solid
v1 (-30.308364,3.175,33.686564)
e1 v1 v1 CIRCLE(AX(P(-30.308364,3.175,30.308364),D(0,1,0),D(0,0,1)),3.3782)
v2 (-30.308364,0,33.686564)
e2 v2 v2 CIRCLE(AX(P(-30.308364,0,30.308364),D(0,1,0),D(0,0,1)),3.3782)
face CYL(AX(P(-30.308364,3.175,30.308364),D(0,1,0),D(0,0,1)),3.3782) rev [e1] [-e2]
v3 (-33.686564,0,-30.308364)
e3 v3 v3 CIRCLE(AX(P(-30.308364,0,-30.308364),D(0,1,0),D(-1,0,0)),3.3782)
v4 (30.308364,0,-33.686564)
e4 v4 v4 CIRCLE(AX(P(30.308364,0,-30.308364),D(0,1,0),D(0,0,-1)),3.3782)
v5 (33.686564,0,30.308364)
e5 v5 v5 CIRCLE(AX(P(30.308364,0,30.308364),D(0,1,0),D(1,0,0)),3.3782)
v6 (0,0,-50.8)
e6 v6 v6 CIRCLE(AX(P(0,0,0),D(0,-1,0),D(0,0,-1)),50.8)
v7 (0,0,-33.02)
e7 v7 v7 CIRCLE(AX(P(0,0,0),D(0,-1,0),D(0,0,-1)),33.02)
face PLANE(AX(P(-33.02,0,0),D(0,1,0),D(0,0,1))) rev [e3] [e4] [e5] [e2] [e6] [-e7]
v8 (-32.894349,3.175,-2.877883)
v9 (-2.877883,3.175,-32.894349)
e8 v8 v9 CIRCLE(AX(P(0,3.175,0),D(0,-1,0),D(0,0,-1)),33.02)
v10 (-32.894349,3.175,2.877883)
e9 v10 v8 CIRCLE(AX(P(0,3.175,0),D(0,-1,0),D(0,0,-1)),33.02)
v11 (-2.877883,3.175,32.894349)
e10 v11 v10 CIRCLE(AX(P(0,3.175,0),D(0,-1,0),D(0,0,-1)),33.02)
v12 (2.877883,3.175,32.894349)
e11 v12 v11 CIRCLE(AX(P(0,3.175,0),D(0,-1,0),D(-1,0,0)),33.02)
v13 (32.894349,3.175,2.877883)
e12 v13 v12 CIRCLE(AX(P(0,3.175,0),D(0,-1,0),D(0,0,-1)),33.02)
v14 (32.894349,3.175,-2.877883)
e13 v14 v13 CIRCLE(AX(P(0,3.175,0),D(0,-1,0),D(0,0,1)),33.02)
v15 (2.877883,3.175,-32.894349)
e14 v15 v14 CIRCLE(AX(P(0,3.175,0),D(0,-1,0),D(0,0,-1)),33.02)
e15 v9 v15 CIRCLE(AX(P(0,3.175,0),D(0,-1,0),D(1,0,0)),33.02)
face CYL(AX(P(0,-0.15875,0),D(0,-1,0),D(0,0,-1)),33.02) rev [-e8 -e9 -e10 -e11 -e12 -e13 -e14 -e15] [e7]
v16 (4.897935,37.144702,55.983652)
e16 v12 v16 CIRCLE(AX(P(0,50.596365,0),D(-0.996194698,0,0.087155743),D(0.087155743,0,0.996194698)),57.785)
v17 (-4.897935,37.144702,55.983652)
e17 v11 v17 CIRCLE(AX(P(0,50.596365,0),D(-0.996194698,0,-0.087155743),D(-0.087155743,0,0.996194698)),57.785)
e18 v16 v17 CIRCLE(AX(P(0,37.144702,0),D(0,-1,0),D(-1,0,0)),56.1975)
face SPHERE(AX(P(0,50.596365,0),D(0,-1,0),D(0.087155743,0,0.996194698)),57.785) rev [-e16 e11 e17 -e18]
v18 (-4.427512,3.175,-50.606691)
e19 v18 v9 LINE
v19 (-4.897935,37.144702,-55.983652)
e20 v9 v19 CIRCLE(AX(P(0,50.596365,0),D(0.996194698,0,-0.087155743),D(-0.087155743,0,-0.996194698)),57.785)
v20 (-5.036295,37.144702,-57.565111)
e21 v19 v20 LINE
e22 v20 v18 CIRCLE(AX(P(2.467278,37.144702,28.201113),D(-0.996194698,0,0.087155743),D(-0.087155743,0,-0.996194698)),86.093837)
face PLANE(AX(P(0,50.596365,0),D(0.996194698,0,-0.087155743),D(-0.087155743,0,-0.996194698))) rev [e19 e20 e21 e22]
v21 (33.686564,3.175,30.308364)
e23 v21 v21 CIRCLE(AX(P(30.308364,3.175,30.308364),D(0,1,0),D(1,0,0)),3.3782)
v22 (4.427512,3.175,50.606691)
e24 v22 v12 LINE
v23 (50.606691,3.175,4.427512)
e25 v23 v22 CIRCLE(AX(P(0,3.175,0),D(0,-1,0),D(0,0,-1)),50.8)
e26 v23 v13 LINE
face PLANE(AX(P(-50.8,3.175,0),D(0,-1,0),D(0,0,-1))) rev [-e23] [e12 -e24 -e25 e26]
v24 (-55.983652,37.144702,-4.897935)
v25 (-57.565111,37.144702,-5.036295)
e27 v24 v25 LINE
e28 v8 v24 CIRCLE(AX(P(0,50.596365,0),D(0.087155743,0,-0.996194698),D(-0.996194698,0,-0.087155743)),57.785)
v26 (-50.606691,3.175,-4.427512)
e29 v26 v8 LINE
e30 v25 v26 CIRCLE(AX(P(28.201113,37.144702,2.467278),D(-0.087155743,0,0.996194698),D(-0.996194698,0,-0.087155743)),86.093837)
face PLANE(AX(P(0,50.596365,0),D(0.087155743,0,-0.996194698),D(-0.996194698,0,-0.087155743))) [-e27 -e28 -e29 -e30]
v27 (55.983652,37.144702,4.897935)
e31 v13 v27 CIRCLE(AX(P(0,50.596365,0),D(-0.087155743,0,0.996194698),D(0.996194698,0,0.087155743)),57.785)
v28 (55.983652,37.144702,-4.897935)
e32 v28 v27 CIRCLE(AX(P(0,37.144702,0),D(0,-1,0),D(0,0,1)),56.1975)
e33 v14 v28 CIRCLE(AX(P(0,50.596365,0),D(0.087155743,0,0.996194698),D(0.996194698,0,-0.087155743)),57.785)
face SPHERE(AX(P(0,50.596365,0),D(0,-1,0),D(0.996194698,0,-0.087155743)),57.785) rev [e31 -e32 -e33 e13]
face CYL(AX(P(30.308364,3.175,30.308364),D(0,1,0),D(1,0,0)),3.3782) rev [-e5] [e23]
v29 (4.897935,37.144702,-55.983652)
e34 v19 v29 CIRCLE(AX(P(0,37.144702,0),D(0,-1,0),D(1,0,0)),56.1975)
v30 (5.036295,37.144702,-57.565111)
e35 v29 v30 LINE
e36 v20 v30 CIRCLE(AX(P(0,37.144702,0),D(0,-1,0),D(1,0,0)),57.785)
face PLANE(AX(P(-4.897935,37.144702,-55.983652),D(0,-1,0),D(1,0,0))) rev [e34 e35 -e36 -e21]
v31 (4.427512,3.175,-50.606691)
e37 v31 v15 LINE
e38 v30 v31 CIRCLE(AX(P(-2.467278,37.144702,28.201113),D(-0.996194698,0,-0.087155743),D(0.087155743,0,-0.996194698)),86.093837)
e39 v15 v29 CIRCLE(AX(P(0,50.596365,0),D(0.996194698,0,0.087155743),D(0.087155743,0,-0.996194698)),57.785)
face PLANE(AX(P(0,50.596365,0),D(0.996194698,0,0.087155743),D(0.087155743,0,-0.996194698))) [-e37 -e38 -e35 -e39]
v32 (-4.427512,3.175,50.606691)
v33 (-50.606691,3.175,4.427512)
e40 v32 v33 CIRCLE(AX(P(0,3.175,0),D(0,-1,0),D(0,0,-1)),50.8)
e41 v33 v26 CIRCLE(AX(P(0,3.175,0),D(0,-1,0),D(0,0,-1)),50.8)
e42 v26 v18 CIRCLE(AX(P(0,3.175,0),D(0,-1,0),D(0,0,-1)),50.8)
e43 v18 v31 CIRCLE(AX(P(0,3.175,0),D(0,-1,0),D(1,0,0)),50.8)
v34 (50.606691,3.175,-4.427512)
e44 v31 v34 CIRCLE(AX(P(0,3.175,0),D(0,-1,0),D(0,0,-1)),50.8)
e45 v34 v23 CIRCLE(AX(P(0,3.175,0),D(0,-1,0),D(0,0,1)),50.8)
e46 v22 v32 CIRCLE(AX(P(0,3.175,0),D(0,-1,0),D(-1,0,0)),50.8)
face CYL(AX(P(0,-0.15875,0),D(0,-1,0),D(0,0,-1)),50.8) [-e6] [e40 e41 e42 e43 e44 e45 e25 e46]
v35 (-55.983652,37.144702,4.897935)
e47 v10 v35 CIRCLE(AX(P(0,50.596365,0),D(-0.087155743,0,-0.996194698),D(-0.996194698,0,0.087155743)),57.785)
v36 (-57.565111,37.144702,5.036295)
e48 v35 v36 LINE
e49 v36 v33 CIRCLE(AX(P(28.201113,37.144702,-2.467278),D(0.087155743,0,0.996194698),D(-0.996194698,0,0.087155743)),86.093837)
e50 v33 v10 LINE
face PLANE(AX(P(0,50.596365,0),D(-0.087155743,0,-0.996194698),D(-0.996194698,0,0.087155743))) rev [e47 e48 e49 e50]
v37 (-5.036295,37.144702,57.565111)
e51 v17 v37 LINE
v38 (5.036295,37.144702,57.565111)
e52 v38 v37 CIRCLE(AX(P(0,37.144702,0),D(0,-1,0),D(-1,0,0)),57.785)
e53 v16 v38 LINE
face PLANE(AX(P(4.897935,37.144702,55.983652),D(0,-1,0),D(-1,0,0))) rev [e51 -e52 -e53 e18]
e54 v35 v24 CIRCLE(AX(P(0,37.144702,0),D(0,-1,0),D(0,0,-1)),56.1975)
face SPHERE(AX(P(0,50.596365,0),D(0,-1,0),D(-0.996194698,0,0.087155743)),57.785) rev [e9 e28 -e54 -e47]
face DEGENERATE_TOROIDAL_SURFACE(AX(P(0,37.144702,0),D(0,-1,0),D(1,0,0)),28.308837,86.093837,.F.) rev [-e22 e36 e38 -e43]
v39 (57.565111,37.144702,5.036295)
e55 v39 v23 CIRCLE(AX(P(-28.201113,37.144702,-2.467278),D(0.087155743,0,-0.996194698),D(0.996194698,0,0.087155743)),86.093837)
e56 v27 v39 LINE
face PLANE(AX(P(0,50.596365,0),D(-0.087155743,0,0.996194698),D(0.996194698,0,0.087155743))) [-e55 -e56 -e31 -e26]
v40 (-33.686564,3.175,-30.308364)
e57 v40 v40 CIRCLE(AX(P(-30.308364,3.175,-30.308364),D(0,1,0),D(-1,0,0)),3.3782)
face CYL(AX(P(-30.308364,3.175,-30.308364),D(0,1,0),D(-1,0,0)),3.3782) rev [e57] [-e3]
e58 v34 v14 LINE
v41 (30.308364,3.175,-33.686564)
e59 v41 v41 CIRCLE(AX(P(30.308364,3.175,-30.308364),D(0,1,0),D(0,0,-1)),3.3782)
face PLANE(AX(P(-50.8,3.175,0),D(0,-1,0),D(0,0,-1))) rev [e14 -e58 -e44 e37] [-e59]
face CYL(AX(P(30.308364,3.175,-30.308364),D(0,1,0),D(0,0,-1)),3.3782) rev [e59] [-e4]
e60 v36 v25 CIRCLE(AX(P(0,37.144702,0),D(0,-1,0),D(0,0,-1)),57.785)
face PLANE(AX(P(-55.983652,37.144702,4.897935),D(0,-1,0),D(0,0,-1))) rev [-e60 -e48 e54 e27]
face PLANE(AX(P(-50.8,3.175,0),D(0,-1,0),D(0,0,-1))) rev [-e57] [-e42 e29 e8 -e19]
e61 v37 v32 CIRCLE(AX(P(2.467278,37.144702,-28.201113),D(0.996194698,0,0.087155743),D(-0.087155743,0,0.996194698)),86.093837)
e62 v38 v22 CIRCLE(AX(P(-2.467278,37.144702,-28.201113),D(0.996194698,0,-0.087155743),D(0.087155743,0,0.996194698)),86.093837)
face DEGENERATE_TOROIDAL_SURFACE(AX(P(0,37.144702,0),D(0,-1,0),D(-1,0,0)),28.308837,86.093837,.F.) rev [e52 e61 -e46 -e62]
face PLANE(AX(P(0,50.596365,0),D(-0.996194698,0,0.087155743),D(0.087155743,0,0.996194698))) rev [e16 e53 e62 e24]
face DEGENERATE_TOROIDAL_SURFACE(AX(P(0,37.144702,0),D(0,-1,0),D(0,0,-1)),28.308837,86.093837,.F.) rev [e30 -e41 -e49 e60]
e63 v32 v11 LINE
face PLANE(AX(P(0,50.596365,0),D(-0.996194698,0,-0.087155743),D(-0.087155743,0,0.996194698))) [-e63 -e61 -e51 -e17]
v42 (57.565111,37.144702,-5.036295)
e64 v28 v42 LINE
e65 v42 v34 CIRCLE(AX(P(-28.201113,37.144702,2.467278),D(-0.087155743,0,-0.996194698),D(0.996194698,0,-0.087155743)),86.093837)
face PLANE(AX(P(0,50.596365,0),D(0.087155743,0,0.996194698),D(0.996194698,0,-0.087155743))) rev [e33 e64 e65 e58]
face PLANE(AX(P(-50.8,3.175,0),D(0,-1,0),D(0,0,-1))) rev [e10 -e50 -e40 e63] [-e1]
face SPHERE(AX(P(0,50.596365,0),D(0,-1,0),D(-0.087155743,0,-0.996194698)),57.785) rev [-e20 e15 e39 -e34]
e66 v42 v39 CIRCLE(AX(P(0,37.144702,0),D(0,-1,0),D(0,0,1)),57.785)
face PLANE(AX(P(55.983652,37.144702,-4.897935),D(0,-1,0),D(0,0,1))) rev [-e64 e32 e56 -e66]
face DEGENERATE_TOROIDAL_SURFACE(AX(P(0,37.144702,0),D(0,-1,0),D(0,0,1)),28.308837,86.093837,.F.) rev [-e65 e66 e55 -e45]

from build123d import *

# Parameters (mm, degrees)
SKETCH3_W               = 17.78
SKETCH3_H               = 3.175
REVOLVE2_ANGLE          = 10
CIRPATTERN1_COUNT       = 4
F_1_4_CLEARANCE_HOLE1_D = 6.7564
CIRPATTERN2_COUNT       = 4


# Read off the part's stored shape, not the designer's step: Revolve2
with BuildPart() as part:
    # Sketch3 → Revolve1 (revolve)
    with BuildSketch(Plane.XY, mode=Mode.PRIVATE) as revolve1_sk:
        with Locations((-41.91, 1.5875)):
            Rectangle(SKETCH3_W, SKETCH3_H)
    revolve(revolve1_sk.sketch.rotate(Axis((0, -0.15875, 0), (0, 1, 0)), 270), axis=Axis((0, -0.15875, 0), (0, 1, 0)))

    # Revolve2 outline → Revolve2 (revolve)
    with BuildSketch(Plane(origin=(0, 0, 0), x_dir=(-0.9961946980917455, 0, -0.0871557427476582), z_dir=(0.0871557427476582, 0, -0.9961946980917455))):
        with BuildLine():
            Line((33.02, 3.175), (50.8, 3.175))
            ThreePointArc((50.8, 3.175), (56.020671736, 19.804496878), (57.785, 37.144702343))
            Line((57.785, 37.144702343), (56.1975, 37.144702343))
            ThreePointArc((56.1975, 37.144702343), (47.732858136, 18.028274757), (33.02, 3.175))
        make_face()
    revolve2 = revolve(axis=Axis((0, 0, 0), (0, 1, 0)), revolution_arc=REVOLVE2_ANGLE)

    # CirPattern1: Revolve2 ×4 about axis
    cirpattern1_axis = Axis((0, -0.15875, 0), (0, 1, 0))
    for i in range(1, CIRPATTERN1_COUNT):
        add(revolve2.rotate(cirpattern1_axis, i * 360 / CIRPATTERN1_COUNT))

    # 1/4 Clearance Hole1 (through all)
    with Locations(Plane(origin=(0, 3.175, 0), x_dir=(1, 0, 0), z_dir=(0, 1, 0))):
        with Locations((-30.308364409, -30.308364409)):
            f_1_4_clearance_hole1 = Hole(F_1_4_CLEARANCE_HOLE1_D / 2)

    # CirPattern2: 1/4 Clearance Hole1 ×4 about axis
    cirpattern2_axis = Axis((0, 0, 0), (0, 1, 0))
    for i in range(1, CIRPATTERN2_COUNT):
        add(f_1_4_clearance_hole1.rotate(cirpattern2_axis, i * 360 / CIRPATTERN2_COUNT), mode=Mode.SUBTRACT)


solid = part.part
